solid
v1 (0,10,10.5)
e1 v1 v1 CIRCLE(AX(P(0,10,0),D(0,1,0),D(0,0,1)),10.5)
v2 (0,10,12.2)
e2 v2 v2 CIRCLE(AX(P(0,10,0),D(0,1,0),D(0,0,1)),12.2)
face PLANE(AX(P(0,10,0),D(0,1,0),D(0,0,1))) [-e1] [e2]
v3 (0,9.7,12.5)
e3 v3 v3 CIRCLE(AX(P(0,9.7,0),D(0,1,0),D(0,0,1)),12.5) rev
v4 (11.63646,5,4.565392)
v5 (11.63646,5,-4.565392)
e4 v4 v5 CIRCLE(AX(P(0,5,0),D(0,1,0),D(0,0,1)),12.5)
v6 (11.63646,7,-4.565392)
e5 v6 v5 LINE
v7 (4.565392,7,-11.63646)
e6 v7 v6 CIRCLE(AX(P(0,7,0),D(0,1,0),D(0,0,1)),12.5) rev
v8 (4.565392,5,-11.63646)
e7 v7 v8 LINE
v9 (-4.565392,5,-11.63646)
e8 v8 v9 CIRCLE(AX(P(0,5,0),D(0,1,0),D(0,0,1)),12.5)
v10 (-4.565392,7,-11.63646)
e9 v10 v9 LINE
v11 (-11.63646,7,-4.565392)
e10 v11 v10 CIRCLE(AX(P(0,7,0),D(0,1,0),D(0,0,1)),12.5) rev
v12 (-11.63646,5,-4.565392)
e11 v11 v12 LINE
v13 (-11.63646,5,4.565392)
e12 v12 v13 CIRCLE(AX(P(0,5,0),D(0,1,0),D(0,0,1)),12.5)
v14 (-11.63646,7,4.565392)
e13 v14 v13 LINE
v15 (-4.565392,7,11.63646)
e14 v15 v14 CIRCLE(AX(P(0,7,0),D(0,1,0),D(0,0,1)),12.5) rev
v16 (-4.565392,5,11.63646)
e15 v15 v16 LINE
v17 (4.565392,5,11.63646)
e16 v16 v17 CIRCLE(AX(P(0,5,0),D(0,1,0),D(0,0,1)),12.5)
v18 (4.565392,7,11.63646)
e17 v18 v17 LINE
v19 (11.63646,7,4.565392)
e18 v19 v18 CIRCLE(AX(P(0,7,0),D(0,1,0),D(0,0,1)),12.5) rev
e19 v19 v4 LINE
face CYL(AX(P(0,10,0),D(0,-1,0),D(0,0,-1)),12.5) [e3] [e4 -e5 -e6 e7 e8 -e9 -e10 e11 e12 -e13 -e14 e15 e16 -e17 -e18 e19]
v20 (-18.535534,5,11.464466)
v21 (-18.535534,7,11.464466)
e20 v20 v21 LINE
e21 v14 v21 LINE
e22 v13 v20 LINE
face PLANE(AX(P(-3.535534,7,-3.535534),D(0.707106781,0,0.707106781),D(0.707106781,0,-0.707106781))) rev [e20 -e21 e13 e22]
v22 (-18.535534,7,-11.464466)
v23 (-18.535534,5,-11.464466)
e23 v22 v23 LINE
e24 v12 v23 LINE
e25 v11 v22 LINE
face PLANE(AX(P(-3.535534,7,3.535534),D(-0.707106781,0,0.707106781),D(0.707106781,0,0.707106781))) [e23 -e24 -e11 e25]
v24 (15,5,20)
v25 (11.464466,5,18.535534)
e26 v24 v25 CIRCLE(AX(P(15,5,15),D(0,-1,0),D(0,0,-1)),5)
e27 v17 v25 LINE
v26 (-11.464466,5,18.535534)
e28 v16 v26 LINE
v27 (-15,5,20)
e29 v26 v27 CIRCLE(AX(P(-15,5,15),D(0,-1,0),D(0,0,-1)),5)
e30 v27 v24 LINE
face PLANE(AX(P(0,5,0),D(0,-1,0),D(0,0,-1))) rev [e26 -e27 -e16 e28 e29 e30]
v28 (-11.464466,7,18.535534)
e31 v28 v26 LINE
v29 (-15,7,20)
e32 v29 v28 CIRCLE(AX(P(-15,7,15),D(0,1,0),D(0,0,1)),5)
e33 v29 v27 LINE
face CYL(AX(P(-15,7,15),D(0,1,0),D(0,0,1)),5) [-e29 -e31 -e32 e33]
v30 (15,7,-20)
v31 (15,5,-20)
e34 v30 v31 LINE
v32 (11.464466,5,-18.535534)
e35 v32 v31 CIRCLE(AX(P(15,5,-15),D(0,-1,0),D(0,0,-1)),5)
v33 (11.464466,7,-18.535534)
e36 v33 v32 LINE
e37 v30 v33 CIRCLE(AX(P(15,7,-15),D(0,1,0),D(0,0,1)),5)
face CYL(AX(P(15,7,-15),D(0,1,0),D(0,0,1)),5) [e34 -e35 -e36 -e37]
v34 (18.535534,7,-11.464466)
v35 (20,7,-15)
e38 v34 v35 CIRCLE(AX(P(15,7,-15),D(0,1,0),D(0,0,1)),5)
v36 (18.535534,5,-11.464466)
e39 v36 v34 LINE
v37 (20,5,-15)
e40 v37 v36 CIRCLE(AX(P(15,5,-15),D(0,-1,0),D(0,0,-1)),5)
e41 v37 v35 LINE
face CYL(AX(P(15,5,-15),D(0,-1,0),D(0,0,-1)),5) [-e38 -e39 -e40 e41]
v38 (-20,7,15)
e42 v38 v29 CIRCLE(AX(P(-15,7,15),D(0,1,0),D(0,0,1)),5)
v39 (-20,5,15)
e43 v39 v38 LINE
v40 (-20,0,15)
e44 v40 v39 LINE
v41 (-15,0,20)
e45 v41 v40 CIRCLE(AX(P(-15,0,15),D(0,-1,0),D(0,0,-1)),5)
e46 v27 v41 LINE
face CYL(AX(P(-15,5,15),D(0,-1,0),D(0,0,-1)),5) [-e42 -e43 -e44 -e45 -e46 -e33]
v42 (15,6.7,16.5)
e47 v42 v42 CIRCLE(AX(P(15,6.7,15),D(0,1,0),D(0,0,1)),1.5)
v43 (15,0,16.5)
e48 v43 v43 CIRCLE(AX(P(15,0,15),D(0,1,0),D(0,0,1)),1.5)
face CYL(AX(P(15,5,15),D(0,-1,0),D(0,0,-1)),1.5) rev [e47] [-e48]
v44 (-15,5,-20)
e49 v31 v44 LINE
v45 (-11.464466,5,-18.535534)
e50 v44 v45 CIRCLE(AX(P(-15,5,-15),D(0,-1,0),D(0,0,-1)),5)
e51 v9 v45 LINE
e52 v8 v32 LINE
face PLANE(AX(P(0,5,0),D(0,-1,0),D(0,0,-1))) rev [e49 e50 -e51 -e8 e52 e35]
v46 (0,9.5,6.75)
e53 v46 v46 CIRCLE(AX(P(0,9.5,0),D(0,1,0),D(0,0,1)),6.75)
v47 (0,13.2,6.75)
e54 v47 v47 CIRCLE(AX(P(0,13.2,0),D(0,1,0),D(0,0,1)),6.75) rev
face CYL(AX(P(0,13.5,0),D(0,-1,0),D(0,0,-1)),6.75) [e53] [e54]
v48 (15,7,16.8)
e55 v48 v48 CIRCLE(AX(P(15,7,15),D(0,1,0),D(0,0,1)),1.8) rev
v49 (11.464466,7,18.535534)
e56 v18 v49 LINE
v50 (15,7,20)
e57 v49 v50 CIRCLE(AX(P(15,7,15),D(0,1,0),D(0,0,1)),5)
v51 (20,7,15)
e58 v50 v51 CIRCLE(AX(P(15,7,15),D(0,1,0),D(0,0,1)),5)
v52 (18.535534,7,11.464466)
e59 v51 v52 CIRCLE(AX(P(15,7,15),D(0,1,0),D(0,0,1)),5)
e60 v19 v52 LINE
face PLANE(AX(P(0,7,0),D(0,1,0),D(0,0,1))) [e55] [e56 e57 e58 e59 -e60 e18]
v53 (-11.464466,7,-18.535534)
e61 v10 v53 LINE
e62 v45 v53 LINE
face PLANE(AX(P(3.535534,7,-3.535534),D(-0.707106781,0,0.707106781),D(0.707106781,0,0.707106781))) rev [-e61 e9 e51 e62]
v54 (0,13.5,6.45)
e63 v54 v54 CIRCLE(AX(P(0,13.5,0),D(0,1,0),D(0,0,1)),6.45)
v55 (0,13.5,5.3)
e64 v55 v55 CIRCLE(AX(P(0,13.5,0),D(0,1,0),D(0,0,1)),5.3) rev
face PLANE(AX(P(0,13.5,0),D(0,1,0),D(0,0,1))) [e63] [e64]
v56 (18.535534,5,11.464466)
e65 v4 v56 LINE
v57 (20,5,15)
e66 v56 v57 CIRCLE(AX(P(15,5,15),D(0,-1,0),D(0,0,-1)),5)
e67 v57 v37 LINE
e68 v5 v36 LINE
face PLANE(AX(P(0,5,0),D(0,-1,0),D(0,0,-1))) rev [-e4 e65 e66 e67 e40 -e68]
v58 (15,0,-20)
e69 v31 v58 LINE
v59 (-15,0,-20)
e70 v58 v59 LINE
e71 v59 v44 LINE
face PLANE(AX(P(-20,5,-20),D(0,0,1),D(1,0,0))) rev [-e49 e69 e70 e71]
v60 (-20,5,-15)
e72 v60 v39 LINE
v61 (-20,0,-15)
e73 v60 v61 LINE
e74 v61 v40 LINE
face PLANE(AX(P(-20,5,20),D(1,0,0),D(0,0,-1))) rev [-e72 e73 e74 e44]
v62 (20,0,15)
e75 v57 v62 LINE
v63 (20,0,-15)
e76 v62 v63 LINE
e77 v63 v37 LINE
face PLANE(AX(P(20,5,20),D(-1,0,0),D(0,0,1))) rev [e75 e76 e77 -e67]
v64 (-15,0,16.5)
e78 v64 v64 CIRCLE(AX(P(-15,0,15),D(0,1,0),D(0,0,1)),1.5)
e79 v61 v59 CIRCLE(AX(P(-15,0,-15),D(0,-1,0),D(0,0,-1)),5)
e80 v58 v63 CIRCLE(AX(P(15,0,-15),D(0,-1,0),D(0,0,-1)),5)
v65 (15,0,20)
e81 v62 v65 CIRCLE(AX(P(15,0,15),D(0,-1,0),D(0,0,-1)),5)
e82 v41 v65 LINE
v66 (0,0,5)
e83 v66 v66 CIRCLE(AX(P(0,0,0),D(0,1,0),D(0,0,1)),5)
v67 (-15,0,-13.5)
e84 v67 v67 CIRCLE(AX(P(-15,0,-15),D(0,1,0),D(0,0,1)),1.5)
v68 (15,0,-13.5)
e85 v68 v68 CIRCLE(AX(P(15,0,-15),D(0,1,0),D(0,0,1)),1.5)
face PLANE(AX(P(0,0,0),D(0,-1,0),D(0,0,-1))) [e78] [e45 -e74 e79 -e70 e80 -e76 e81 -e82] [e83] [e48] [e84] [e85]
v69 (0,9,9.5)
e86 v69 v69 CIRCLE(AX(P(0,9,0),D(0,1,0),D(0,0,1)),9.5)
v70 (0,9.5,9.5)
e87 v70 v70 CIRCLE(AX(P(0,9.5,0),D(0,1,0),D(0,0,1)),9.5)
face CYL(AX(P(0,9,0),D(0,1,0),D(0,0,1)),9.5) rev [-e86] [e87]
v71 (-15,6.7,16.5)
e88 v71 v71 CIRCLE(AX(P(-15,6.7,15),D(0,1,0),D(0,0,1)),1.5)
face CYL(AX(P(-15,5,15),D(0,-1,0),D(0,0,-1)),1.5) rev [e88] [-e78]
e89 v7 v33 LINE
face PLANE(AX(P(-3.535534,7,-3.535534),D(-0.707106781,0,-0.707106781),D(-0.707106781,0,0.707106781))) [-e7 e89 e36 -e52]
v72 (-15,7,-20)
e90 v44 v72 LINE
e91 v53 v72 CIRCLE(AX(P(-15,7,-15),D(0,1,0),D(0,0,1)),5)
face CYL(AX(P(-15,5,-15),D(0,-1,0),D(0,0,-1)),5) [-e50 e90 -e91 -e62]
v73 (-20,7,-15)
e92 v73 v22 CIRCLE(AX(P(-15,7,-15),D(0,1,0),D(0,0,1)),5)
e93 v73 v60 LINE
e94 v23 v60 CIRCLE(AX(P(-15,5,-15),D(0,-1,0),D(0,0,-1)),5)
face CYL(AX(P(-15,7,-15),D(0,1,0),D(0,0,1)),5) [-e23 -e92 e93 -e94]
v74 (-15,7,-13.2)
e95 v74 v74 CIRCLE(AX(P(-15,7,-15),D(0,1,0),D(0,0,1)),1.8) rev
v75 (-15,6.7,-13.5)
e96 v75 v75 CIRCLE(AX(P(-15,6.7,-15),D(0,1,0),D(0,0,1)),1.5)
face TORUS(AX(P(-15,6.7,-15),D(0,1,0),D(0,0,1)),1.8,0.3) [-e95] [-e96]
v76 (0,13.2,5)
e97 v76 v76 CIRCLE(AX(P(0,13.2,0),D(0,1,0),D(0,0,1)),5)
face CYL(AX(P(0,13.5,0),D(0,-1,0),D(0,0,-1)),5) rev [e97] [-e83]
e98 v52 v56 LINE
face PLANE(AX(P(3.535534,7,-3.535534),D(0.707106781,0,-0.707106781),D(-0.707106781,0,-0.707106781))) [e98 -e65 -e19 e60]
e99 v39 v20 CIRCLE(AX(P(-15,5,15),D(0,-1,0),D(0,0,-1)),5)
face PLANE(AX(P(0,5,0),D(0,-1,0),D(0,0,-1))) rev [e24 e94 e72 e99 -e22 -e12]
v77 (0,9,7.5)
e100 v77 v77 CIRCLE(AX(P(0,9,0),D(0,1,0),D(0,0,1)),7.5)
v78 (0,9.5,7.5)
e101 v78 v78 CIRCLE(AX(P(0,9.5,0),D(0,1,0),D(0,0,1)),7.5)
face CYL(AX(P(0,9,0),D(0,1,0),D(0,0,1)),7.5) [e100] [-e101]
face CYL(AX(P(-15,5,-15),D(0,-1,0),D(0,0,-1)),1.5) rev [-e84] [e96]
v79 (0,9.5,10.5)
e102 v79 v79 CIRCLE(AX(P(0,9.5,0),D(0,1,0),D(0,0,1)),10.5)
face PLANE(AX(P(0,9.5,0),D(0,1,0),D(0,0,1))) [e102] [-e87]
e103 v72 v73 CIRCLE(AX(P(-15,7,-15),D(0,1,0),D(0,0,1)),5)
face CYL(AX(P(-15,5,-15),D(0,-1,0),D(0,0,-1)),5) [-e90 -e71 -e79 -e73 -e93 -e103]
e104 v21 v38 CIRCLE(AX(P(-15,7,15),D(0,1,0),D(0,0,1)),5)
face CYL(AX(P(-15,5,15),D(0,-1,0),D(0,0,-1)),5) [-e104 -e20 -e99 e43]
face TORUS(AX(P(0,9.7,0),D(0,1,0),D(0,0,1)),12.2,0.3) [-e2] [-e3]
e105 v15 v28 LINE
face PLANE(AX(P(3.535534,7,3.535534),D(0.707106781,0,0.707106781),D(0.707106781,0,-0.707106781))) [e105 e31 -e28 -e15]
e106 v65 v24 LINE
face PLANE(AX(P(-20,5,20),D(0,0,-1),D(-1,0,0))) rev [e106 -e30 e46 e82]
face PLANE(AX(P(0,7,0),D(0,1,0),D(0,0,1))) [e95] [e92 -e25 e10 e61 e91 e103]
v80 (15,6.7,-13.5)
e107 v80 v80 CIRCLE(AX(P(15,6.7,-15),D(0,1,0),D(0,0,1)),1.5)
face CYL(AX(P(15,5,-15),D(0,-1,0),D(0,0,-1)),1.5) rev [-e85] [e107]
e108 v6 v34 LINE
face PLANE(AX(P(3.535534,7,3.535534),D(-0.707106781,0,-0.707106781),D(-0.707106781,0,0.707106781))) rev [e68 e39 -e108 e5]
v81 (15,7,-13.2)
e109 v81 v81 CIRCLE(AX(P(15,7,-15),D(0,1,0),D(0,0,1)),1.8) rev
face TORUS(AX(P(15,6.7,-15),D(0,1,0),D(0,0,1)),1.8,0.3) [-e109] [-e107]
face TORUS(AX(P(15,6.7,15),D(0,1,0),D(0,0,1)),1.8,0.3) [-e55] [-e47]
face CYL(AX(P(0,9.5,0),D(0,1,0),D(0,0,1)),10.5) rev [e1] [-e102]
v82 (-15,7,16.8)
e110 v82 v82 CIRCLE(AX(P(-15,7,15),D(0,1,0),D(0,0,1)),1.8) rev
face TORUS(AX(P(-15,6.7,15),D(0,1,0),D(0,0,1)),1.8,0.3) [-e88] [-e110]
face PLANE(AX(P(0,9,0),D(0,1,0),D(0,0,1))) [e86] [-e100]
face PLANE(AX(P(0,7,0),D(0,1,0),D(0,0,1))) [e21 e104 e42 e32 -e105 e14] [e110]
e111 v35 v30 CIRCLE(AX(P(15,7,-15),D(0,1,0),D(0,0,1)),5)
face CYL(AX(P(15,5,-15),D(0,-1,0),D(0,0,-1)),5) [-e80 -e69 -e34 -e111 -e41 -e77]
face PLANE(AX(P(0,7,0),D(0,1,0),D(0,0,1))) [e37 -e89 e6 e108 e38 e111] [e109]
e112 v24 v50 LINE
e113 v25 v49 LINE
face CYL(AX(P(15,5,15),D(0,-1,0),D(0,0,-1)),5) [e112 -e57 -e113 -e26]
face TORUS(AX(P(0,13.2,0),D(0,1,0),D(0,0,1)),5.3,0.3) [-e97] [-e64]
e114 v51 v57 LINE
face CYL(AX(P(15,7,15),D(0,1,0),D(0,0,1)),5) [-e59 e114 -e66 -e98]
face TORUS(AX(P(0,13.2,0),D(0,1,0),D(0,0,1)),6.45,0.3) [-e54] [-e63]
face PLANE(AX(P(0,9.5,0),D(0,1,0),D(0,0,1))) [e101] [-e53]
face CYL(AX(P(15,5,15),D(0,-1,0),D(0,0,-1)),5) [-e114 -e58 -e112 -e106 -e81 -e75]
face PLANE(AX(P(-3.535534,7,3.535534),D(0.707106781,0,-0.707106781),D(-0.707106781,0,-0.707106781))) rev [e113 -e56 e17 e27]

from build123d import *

# Parameters (mm, degrees)
SKETCH1_W           = 40
SKETCH1_H           = 40
SKETCH1_R           = 1.5
BOSS_EXTRUDE1_DEPTH = 5
FILLET1_R           = 5
SKETCH2_R           = 12.5
BOSS_EXTRUDE2_DEPTH = 5
SKETCH3_R           = 10.5
CUT_EXTRUDE1_DEPTH  = 0.5
SKETCH4_R           = 9.5
SKETCH4_R_2         = 7.5
CUT_EXTRUDE2_DEPTH  = 0.5
SKETCH5_R           = 6.75
SKETCH5_R_2         = 5
BOSS_EXTRUDE3_DEPTH = 4
SKETCH6_R           = 5
CUT_EXTRUDE3_DEPTH  = 30.837057496
SKETCH7_R           = 1.5
BOSS_EXTRUDE4_DEPTH = 2
FILLET2_R           = 5
FILLET3_R           = 0.3
FILLET4_R           = 0.3
FILLET5_R           = 0.3


with BuildPart() as part:
    # Sketch1 → Boss-Extrude1 (new body)
    with BuildSketch(Plane(origin=(0, 0, 0), x_dir=(1, 0, 0), z_dir=(0, 1, 0))):
        Rectangle(SKETCH1_W, SKETCH1_H)
        with Locations(Location((-15, 15, 0), (0, 0, 270))):
            Circle(SKETCH1_R, mode=Mode.SUBTRACT)
        with Locations(Location((15, 15, 0), (0, 0, 270))):
            Circle(SKETCH1_R, mode=Mode.SUBTRACT)
        with Locations(Location((15, -15, 0), (0, 0, 270))):
            Circle(SKETCH1_R, mode=Mode.SUBTRACT)
        with Locations(Location((-15, -15, 0), (0, 0, 270))):
            Circle(SKETCH1_R, mode=Mode.SUBTRACT)
    extrude(amount=BOSS_EXTRUDE1_DEPTH)

    # Fillet1
    fillet1_edges = [part.edges().sort_by_distance(p)[0] for p in [
        (20, 2.5, 20),
        (-20, 2.5, 20),
        (-20, 2.5, -20),
        (20, 2.5, -20),
    ]]
    fillet(fillet1_edges, radius=FILLET1_R)

    # Sketch2 → Boss-Extrude2 (add)
    with BuildSketch(Plane(origin=(0, 5, 0), x_dir=(1, 0, 0), z_dir=(0, 1, 0))):
        with Locations(Location((0, 0, 0), (0, 0, 270))):
            Circle(SKETCH2_R)
    extrude(amount=BOSS_EXTRUDE2_DEPTH)

    # Sketch3 → Cut-Extrude1 (cut)
    with BuildSketch(Plane(origin=(0, 10, 0), x_dir=(1, 0, 0), z_dir=(0, 1, 0))):
        with Locations(Location((0, 0, 0), (0, 0, 270))):
            Circle(SKETCH3_R)
    extrude(amount=-CUT_EXTRUDE1_DEPTH, mode=Mode.SUBTRACT)

    # Sketch4 → Cut-Extrude2 (cut)
    with BuildSketch(Plane(origin=(0, 9.5, 0), x_dir=(1, 0, 0), z_dir=(0, 1, 0))):
        with Locations(Location((0, 0, 0), (0, 0, 270))):
            Circle(SKETCH4_R)
        with Locations(Location((0, 0, 0), (0, 0, 270))):
            Circle(SKETCH4_R_2, mode=Mode.SUBTRACT)
    extrude(amount=-CUT_EXTRUDE2_DEPTH, mode=Mode.SUBTRACT)

    # Sketch5 → Boss-Extrude3 (add)
    with BuildSketch(Plane(origin=(0, 9.5, 0), x_dir=(1, 0, 0), z_dir=(0, 1, 0))):
        with Locations(Location((0, 0, 0), (0, 0, 270))):
            Circle(SKETCH5_R)
        with Locations(Location((0, 0, 0), (0, 0, 270))):
            Circle(SKETCH5_R_2, mode=Mode.SUBTRACT)
    extrude(amount=BOSS_EXTRUDE3_DEPTH)

    # Sketch6 → Cut-Extrude3 (cut, through all)
    with BuildSketch(Plane(origin=(0, 9.5, 0), x_dir=(1, 0, 0), z_dir=(0, 1, 0))):
        with Locations(Location((0, 0, 0), (0, 0, 270))):
            Circle(SKETCH6_R)
    extrude(amount=-CUT_EXTRUDE3_DEPTH, mode=Mode.SUBTRACT)

    # Sketch7 → Boss-Extrude4 (add)
    # profile 1 of 5: a face of its own
    with BuildSketch(Plane(origin=(0, 5, 0), x_dir=(1, 0, 0), z_dir=(0, 1, 0))):
        with BuildLine():
            ThreePointArc((-11.636459779, 4.565391967), (-8.838834765, 8.838834765), (-4.565391967, 11.636459779))
            Line((-4.565391967, 11.636459779), (-12.928932188, 20))
            Line((-12.928932188, 20), (-15, 20))
            ThreePointArc((-15, 20), (-18.535533906, 18.535533906), (-20, 15))
            Line((-20, 15), (-20, 12.928932188))
            Line((-20, 12.928932188), (-11.636459779, 4.565391967))
        make_face()
        with Locations(Location((-15, 15, 0), (0, 0, 270))):
            Circle(SKETCH7_R, mode=Mode.SUBTRACT)
    # profile 2 of 5: a face of its own
    with BuildSketch(Plane(origin=(0, 5, 0), x_dir=(1, 0, 0), z_dir=(0, 1, 0))):
        with BuildLine():
            ThreePointArc((4.565391967, 11.636459779), (6.846531969, 10.458250332), (8.838834765, 8.838834765))
            Line((8.838834765, 8.838834765), (13.939339828, 13.939339828))
            ThreePointArc((13.939339828, 13.939339828), (13.939339828, 16.060660172), (16.060660172, 16.060660172))
            Line((16.060660172, 16.060660172), (18.535533906, 18.535533906))
            ThreePointArc((18.535533906, 18.535533906), (16.913417162, 19.619397663), (15, 20))
            Line((15, 20), (12.928932188, 20))
            Line((12.928932188, 20), (4.565391967, 11.636459779))
        make_face()
    # profile 3 of 5: a face of its own
    with BuildSketch(Plane(origin=(0, 5, 0), x_dir=(1, 0, 0), z_dir=(0, 1, 0))):
        with BuildLine():
            ThreePointArc((8.838834765, 8.838834765), (10.458250332, 6.846531969), (11.636459779, 4.565391967))
            Line((11.636459779, 4.565391967), (20, 12.928932188))
            Line((20, 12.928932188), (20, 15))
            ThreePointArc((20, 15), (19.619397663, 16.913417162), (18.535533906, 18.535533906))
            Line((18.535533906, 18.535533906), (16.060660172, 16.060660172))
            ThreePointArc((16.060660172, 16.060660172), (16.385819299, 15.574025149), (16.5, 15))
            ThreePointArc((16.5, 15), (15.574025149, 13.614180701), (13.939339828, 13.939339828))
            Line((13.939339828, 13.939339828), (8.838834765, 8.838834765))
        make_face()
    # profile 4 of 5: a face of its own
    with BuildSketch(Plane(origin=(0, 5, 0), x_dir=(1, 0, 0), z_dir=(0, 1, 0))):
        with BuildLine():
            Line((20, -15), (20, -12.928932188))
            Line((20, -12.928932188), (11.636459779, -4.565391967))
            ThreePointArc((11.636459779, -4.565391967), (8.838834765, -8.838834765), (4.565391967, -11.636459779))
            Line((4.565391967, -11.636459779), (12.928932188, -20))
            Line((12.928932188, -20), (15, -20))
            ThreePointArc((15, -20), (18.535533906, -18.535533906), (20, -15))
        make_face()
        with Locations(Location((15, -15, 0), (0, 0, 270))):
            Circle(SKETCH7_R, mode=Mode.SUBTRACT)
    # profile 5 of 5: a face of its own
    with BuildSketch(Plane(origin=(0, 5, 0), x_dir=(1, 0, 0), z_dir=(0, 1, 0))):
        with BuildLine():
            Line((-12.928932188, -20), (-4.565391967, -11.636459779))
            ThreePointArc((-4.565391967, -11.636459779), (-8.838834765, -8.838834765), (-11.636459779, -4.565391967))
            Line((-11.636459779, -4.565391967), (-20, -12.928932188))
            Line((-20, -12.928932188), (-20, -15))
            ThreePointArc((-20, -15), (-18.535533906, -18.535533906), (-15, -20))
            Line((-15, -20), (-12.928932188, -20))
        make_face()
        with Locations(Location((-15, -15, 0), (0, 0, 270))):
            Circle(SKETCH7_R, mode=Mode.SUBTRACT)
    extrude(amount=BOSS_EXTRUDE4_DEPTH)

    # Fillet2
    fillet2_edges = [part.edges().sort_by_distance(p)[0] for p in [
        (20, 6, -12.928932188),
        (20, 6, 12.928932188),
        (-12.928932188, 6, -20),
        (12.928932188, 6, -20),
        (-20, 6, 12.928932188),
        (12.928932188, 6, 20),
        (-12.928932188, 6, 20),
        (-20, 6, -12.928932188),
    ]]
    fillet(fillet2_edges, radius=FILLET2_R - 0.0001)  # a hair under: the kernel refuses the full size

    # Fillet3
    fillet3_edges = [part.edges().sort_by_distance(p)[0] for p in [
        (13.939339828, 7, -13.939339828),
        (15, 7, 13.5),
        (-15, 7, 13.5),
        (-15, 7, -16.5),
    ]]
    fillet(fillet3_edges, radius=FILLET3_R)

    # Fillet4
    fillet4_edges = [part.edges().sort_by_distance(p)[0] for p in [
        (0, 10, -12.5),
        (0, 13.5, -5),
    ]]
    fillet(fillet4_edges, radius=FILLET4_R)

    # Fillet5
    fillet5_edges = [part.edges().sort_by_distance(p)[0] for p in [
        (0, 13.5, -6.75),
    ]]
    fillet(fillet5_edges, radius=FILLET5_R)


solid = part.part
